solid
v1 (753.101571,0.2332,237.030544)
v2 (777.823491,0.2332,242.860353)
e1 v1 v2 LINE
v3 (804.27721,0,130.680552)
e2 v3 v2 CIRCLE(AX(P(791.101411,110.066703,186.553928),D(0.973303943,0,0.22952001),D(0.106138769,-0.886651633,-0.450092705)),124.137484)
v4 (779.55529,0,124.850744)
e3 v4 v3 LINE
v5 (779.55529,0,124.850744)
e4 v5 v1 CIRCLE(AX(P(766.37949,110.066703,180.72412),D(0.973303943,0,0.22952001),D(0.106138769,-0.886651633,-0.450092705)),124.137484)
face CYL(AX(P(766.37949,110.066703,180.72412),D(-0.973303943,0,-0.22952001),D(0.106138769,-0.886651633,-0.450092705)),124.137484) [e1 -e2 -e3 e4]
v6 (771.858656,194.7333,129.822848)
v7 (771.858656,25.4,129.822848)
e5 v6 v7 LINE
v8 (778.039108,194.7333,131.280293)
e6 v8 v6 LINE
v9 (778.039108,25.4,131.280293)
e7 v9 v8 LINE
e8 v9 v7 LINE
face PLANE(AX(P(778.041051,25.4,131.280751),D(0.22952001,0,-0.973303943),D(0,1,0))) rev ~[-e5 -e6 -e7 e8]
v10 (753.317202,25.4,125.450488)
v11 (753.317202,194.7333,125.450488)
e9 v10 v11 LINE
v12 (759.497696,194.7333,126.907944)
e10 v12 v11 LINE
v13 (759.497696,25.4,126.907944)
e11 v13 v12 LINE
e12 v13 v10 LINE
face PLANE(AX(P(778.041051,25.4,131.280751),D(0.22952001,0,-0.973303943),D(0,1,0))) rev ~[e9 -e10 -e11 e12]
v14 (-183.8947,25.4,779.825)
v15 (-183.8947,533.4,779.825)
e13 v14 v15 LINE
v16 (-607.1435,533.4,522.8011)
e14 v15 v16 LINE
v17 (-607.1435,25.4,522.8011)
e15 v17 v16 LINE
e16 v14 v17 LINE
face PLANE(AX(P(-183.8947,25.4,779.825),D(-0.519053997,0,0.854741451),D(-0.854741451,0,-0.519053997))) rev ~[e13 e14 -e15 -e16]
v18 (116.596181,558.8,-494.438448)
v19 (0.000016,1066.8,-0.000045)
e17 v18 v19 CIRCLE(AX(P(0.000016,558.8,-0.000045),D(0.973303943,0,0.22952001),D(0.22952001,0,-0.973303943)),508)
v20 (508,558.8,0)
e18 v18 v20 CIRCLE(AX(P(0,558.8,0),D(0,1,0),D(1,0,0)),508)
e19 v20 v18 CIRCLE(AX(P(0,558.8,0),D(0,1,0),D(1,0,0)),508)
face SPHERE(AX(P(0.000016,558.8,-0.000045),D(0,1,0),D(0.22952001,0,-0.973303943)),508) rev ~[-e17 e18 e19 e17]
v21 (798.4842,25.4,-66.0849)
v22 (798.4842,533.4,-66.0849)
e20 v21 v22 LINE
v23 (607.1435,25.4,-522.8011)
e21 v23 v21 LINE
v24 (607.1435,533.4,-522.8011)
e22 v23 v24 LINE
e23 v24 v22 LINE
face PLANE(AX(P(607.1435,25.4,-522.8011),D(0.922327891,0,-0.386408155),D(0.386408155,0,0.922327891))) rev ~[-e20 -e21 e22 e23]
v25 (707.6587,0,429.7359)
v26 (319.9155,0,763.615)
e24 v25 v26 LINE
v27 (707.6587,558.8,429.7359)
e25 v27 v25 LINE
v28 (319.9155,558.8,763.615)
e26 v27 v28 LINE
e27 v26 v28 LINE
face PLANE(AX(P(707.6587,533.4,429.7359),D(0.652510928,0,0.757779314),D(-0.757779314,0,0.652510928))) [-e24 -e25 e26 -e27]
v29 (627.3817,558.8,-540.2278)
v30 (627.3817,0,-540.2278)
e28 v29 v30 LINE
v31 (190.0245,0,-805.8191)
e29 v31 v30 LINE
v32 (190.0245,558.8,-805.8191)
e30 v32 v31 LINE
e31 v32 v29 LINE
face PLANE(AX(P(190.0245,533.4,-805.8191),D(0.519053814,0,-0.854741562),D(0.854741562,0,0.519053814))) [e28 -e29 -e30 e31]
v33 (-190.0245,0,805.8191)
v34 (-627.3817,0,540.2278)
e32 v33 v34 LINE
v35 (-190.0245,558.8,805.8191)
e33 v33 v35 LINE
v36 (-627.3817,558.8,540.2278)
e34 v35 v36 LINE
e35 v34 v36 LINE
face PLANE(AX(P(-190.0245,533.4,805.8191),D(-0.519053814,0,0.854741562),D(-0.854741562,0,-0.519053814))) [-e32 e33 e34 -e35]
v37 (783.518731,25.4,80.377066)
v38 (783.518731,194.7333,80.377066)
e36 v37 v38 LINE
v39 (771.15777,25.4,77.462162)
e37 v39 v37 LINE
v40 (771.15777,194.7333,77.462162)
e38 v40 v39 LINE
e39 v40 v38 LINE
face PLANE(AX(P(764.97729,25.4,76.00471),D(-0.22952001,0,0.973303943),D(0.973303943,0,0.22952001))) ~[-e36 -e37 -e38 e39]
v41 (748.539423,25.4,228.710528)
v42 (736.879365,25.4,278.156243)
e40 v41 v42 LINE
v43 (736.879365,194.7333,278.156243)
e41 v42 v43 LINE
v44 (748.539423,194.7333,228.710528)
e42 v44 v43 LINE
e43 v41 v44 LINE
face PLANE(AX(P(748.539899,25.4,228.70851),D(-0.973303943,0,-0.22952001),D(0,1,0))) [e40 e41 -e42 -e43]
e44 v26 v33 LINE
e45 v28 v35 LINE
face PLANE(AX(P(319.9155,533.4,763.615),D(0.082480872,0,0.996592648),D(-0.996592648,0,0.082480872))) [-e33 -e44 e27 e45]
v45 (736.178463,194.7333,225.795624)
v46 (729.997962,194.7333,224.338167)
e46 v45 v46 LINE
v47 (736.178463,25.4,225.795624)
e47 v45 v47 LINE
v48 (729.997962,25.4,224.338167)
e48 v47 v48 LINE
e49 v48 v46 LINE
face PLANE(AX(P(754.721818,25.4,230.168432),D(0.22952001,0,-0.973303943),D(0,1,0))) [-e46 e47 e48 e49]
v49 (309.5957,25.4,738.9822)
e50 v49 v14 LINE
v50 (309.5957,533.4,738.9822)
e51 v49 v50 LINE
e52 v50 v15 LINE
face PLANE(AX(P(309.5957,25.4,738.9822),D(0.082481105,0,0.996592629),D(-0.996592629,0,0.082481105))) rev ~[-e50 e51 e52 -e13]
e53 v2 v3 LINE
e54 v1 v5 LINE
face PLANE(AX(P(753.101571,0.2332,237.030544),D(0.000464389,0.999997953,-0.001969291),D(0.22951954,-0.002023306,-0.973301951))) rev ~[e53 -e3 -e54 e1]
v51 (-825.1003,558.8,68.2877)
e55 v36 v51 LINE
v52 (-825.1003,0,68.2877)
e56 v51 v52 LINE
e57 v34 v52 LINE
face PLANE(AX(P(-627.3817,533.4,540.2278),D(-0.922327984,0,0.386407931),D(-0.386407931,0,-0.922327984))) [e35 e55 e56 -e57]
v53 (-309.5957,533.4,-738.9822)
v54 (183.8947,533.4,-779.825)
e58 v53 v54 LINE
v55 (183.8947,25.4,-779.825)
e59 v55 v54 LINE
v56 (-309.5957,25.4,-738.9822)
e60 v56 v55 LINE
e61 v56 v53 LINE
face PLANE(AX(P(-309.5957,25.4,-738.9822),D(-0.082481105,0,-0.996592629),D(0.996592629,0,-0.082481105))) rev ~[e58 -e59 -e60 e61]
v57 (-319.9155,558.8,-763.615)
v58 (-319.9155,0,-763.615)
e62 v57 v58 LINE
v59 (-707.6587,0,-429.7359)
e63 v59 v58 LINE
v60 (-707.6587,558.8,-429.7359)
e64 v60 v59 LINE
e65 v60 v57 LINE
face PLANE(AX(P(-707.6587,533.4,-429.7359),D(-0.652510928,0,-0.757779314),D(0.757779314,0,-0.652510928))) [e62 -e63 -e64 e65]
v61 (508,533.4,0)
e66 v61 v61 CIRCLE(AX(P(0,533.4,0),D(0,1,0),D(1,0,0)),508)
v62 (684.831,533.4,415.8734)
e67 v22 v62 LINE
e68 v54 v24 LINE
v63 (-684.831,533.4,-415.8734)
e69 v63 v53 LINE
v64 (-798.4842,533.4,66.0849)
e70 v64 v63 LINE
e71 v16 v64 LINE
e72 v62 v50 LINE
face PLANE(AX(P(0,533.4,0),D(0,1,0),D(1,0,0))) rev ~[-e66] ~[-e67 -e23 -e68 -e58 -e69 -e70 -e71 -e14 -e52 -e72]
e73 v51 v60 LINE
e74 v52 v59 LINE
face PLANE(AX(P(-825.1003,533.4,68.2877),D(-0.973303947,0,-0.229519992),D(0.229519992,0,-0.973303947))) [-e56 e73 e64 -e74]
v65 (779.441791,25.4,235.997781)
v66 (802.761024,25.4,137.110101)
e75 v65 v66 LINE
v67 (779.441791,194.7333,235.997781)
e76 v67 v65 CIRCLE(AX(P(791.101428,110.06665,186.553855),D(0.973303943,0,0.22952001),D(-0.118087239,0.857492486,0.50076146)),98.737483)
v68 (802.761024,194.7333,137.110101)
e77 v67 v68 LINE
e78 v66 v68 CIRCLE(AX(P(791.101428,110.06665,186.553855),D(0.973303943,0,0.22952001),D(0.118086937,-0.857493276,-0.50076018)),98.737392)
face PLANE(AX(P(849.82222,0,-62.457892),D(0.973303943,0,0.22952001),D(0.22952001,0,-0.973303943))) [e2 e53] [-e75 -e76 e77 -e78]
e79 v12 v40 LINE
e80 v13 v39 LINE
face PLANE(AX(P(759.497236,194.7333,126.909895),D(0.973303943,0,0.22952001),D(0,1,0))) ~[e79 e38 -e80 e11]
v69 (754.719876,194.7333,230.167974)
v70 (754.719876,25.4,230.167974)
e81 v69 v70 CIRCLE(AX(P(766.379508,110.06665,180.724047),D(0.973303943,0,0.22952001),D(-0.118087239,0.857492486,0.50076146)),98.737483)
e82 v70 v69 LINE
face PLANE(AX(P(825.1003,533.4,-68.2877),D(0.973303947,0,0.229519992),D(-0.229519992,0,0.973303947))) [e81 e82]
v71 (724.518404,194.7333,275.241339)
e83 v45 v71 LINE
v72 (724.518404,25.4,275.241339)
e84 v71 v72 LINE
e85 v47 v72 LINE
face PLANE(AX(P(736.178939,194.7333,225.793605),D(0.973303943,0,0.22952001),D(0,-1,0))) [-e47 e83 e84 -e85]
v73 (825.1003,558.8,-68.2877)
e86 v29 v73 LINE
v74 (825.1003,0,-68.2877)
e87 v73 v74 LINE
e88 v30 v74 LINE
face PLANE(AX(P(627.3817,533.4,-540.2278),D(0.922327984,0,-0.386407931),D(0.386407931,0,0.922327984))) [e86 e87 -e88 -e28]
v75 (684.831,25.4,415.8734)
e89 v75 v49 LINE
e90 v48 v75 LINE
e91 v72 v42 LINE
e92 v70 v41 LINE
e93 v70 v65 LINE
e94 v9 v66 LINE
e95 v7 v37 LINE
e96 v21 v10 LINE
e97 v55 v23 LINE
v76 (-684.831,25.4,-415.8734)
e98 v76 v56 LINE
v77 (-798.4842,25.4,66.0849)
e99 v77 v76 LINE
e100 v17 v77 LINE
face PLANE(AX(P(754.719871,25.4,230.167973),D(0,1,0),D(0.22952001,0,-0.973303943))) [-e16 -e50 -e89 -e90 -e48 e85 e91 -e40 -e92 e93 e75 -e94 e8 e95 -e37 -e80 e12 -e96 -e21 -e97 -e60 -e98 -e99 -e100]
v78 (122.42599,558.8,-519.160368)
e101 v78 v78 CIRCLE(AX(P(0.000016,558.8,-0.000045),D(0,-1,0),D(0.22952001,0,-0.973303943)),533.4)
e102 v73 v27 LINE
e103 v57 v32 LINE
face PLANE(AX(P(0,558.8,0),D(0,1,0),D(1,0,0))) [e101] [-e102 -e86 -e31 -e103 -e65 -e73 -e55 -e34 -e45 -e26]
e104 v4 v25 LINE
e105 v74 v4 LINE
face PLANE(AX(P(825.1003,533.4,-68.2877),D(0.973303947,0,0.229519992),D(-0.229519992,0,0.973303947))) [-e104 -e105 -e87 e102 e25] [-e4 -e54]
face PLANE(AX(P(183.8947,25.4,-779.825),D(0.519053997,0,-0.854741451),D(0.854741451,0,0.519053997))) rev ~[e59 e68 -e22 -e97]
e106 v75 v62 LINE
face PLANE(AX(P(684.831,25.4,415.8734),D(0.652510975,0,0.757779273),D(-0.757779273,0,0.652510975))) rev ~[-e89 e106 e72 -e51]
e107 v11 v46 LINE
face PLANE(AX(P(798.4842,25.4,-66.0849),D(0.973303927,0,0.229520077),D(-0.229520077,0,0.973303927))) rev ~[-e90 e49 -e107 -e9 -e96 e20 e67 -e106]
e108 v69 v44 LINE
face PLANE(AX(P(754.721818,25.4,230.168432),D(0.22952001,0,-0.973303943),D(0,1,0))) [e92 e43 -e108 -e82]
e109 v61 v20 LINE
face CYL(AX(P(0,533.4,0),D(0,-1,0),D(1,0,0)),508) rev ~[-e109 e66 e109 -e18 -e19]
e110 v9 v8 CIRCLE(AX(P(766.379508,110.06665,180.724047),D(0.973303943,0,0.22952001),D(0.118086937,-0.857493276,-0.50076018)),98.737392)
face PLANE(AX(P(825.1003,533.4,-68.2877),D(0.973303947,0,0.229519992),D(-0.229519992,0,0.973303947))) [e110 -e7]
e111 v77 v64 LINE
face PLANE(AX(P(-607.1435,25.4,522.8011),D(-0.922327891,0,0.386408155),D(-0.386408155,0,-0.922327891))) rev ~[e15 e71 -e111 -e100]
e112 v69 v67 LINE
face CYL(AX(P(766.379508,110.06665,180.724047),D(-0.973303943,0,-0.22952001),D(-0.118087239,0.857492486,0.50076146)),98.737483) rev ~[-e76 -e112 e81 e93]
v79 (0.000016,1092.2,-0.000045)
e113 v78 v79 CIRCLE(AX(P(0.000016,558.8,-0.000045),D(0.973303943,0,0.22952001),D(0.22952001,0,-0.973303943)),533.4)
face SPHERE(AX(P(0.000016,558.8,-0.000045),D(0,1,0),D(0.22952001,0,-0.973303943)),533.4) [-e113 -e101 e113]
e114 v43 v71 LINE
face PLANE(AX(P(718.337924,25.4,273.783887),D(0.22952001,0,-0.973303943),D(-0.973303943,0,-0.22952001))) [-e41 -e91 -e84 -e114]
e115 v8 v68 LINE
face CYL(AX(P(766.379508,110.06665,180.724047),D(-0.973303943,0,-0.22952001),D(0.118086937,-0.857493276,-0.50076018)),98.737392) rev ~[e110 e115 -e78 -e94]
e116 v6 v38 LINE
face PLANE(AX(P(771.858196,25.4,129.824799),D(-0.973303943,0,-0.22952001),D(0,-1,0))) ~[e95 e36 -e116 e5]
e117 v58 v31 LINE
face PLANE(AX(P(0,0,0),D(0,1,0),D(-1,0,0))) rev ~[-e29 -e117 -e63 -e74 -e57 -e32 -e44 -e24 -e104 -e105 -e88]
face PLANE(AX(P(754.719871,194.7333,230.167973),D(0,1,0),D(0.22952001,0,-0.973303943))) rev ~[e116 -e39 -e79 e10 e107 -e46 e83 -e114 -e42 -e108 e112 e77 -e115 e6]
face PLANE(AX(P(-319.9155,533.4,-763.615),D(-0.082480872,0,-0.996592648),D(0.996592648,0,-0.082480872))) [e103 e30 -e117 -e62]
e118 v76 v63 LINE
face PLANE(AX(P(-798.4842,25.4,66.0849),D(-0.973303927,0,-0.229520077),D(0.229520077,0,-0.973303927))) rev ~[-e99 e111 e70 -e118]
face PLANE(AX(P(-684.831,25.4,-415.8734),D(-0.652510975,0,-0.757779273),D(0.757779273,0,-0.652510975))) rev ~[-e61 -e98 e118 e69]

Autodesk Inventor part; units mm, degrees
ref_plane "YZ Plane" through (0, 0, 0) normal (1, 0, 0) x (0, 1, 0)
sketch "Sketch1" plane through (0, 0, 0) normal (0, 1, 0) x (-1, 0, 0)
  line L0 (707.6587, -429.7359) -> (319.9155, -763.615)
  line L1 (319.9155, -763.615) -> (-190.0245, -805.8191)
  line L2 (-190.0245, -805.8191) -> (-627.3817, -540.2278)
  line L3 (-627.3817, -540.2278) -> (-825.1003, -68.2877)
  line L4 (-825.1003, -68.2877) -> (-707.6587, 429.7359)
  line L5 (-707.6587, 429.7359) -> (-319.9155, 763.615)
  line L6 (-319.9155, 763.615) -> (190.0245, 805.8191)
  line L7 (190.0245, 805.8191) -> (627.3817, 540.2278)
  line L8 (627.3817, 540.2278) -> (825.1003, 68.2877)
  line L9 (825.1003, 68.2877) -> (707.6587, -429.7359)
  point P0 (0, 0)
  point P1 (0, 0)
  dimension "d0" = 1574.8
extrude "bace" add sketch "Sketch1" along normal blind 25.4
sketch "Sketch2" plane through (0, 25.4, 0) normal (0, 1, 0) x (1, 0, 0)
  line L0 (-319.9155, 763.615) -> (-707.6587, 429.7359) projected
  line L1 (-707.6587, 429.7359) -> (-319.9155, 763.615)
  line L2 (-319.9155, 763.615) -> (190.0245, 805.8191)
  line L3 (190.0245, 805.8191) -> (627.3817, 540.2278)
  line L4 (627.3817, 540.2278) -> (825.1003, 68.2877)
  line L5 (825.1003, 68.2877) -> (707.6587, -429.7359)
  line L6 (707.6587, -429.7359) -> (319.9155, -763.615)
  line L7 (319.9155, -763.615) -> (-190.0245, -805.8191)
  line L8 (-190.0245, -805.8191) -> (-627.3817, -540.2278)
  line L9 (-627.3817, -540.2278) -> (-825.1003, -68.2877)
  line L10 (-825.1003, -68.2877) -> (-707.6587, 429.7359)
  line L11 (-684.831, 415.8734) -> (-309.5957, 738.9822)
  line L12 (-309.5957, 738.9822) -> (183.8947, 779.825)
  line L13 (183.8947, 779.825) -> (607.1435, 522.8011)
  line L14 (607.1435, 522.8011) -> (798.4842, 66.0849)
  line L15 (798.4842, 66.0849) -> (684.831, -415.8734)
  line L16 (684.831, -415.8734) -> (309.5957, -738.9822)
  line L17 (309.5957, -738.9822) -> (-183.8947, -779.825)
  line L18 (-183.8947, -779.825) -> (-607.1435, -522.8011)
  line L19 (-607.1435, -522.8011) -> (-798.4842, -66.0849)
  line L20 (-798.4842, -66.0849) -> (-684.831, 415.8734)
  line L21 (-707.6587, 429.7359) -> (-825.1003, -68.2877) projected
  point P0 (0, 0)
  point P1 (0, 0)
  point P2 (0, 0)
  dimension "d4" = 25.4
extrude "bace wall" add sketch "Sketch2" along normal blind 508
sketch "Sketch3" plane through (0, 533.4, 0) normal (0, 1, 0) x (1, 0, 0)
  line L0 (-627.3817, -540.2278) -> (-825.1003, -68.2877) projected
  line L1 (-825.1003, -68.2877) -> (-707.6587, 429.7359)
  line L2 (-707.6587, 429.7359) -> (-319.9155, 763.615)
  line L3 (-319.9155, 763.615) -> (190.0245, 805.8191)
  line L4 (190.0245, 805.8191) -> (627.3817, 540.2278)
  line L5 (627.3817, 540.2278) -> (825.1003, 68.2877)
  line L6 (825.1003, 68.2877) -> (707.6587, -429.7359)
  line L7 (707.6587, -429.7359) -> (319.9155, -763.615)
  line L8 (319.9155, -763.615) -> (-190.0245, -805.8191)
  line L9 (-190.0245, -805.8191) -> (-627.3817, -540.2278)
  line L10 (-627.3817, -540.2278) -> (-825.1003, -68.2877)
  circle A0 centre (0, 0) radius 508
  point P0 (-798.4842, -66.0849)
  dimension "d28" = 1016
extrude "bace cieiling" add sketch "Sketch3" along normal blind 25.4
ref_plane "dome work plane" through (56.8266, 25.4, -240.9792) normal (0.9733039, 0, 0.22952) x (0.22952, 0, -0.9733039)
sketch "Sketch10" plane through (56.8266, 25.4, -240.9792) normal (0.9733039, 0, 0.22952) x (0.22952, 0, -0.9733039)
  line L0 (285.8112, 533.4) -> (260.4112, 533.4)
  line L1 (-755.5888, 533.4) -> (260.4112, 533.4) projected
  arc A0 (260.4112, 533.4) -> (-247.5888, 1041.4) centre (-247.5888, 533.4) ccw
  arc A1 (285.8112, 533.4) -> (-247.5888, 1066.8) centre (-247.5888, 533.4) ccw
  line L2 (-247.5888, 1066.8) -> (-247.5888, 1041.4)
  line L3 (-247.5888, 1041.4) -> (-247.5888, 533.4) construction
  point P0 (-247.5888, -25.4)
  dimension "d32" = 508
  dimension "d33" = 533.4
revolve "dome" add sketch "Sketch10" angle 360 about axis through (0, 1066.8, 0) along (0, -1, 0)
sketch "Sketch8" plane through (825.1003, 0, -68.2877) normal (0.9733039, 0, 0.22952) x (0.22952, 0, -0.9733039)
  line L0 (-255.8418, 25.4) -> (-205.0418, 25.4)
  line L1 (-205.0418, 25.4) -> (-205.0418, 194.7333)
  line L2 (-205.0418, 194.7333) -> (-255.8418, 194.7333)
  line L3 (-255.8418, 194.7333) -> (-255.8418, 25.4)
  line L4 (-255.8418, 25.4) -> (-306.6418, 25.4)
  line L5 (-306.6418, 25.4) -> (-306.6418, 194.7333)
  line L6 (-306.6418, 194.7333) -> (-255.8418, 194.7333)
  line L7 (-503.4306, 25.4) -> (-8.253, 25.4) projected
  point P0 (-255.8418, 0)
  point P1 (-255.8418, 25.4)
  dimension "d16" = 50.8
  dimension "d17" = 169.3333
extrude "door frame" cut sketch "Sketch8" against normal blind 25.4
sketch "Sketch7" plane through (825.1003, 0, -68.2877) normal (0.9733039, 0, 0.22952) x (0.22952, 0, -0.9733039)
  line L0 (-306.6418, 194.7333) -> (-205.0418, 194.7333)
  line L1 (-306.6418, 25.4) -> (-205.0418, 25.4)
  arc A0 (-198.4359, 0) -> (-313.6926, 0.2332) centre (-255.8418, 110.0667) ccw
  arc A1 (-306.6418, 194.7333) -> (-306.6418, 25.4) centre (-255.8418, 110.0667) ccw
  arc A2 (-205.0418, 25.4) -> (-205.0418, 194.7333) centre (-255.8418, 110.0667) ccw
  line L2 (-306.6418, 194.7333) -> (-205.0418, 194.7333)
  line L3 (-306.6418, 194.7333) -> (-306.6418, 25.4)
  line L4 (-313.6926, 0.2332) -> (-198.4359, 0)
  point P0 (-255.8418, 0)
  point P1 (-255.8418, 194.7333)
  point P2 (-306.6418, 110.0667)
  point P3 (-255.8418, 110.0667)
  point P4 (-256.0642, 0.1166)
  dimension "d14" = 169.3333
  dimension "d15" = 101.6
extrude "corridor connection" add sketch "Sketch7" along normal blind 25.4
sketch "Sketch9" plane through (729.998, 25.4, 224.3381) normal (0.22952, 0, -0.9733039) x (-0.9733039, 0, -0.22952)
  line L0 (-12.7, 169.3333) -> (-6.35, 169.3333)
  line L1 (-6.35, 169.3333) -> (-6.35, 0)
  line L2 (-6.35, 0) -> (-19.05, 0)
  line L3 (-19.05, 0) -> (-19.05, 169.3333)
  line L4 (-12.7, 169.3333) -> (-19.05, 169.3333)
  line L5 (-25.4, -25.4) -> (-25.4, 208.8041) projected
  point P0 (762, -25.4)
  point P1 (-25.4, -25.4)
  point P2 (-25.4, 169.3333)
  point P3 (0, 169.3333)
  point P4 (-25.4, 0)
  point P5 (0, 0)
  point P6 (-25.4, 169.3333)
  point P7 (-25.4, -25.1668)
  dimension "d22" = 6.35
  dimension "d23" = 12.7
  dimension "d24" = 169.3333
extrude "left door slot" cut sketch "Sketch9" against normal blind 50.8
ref_plane "door slot mirror" through (766.3795, 25.4, 180.7241) normal (0.22952, 0, -0.9733039) x (-0.9733039, 0, -0.22952)
mirror "Mirror1" about plane through (766.3795, 25.4, 180.7241) normal (0.22952, 0, -0.9733039) of "left door slot"
properties part number "dome"
